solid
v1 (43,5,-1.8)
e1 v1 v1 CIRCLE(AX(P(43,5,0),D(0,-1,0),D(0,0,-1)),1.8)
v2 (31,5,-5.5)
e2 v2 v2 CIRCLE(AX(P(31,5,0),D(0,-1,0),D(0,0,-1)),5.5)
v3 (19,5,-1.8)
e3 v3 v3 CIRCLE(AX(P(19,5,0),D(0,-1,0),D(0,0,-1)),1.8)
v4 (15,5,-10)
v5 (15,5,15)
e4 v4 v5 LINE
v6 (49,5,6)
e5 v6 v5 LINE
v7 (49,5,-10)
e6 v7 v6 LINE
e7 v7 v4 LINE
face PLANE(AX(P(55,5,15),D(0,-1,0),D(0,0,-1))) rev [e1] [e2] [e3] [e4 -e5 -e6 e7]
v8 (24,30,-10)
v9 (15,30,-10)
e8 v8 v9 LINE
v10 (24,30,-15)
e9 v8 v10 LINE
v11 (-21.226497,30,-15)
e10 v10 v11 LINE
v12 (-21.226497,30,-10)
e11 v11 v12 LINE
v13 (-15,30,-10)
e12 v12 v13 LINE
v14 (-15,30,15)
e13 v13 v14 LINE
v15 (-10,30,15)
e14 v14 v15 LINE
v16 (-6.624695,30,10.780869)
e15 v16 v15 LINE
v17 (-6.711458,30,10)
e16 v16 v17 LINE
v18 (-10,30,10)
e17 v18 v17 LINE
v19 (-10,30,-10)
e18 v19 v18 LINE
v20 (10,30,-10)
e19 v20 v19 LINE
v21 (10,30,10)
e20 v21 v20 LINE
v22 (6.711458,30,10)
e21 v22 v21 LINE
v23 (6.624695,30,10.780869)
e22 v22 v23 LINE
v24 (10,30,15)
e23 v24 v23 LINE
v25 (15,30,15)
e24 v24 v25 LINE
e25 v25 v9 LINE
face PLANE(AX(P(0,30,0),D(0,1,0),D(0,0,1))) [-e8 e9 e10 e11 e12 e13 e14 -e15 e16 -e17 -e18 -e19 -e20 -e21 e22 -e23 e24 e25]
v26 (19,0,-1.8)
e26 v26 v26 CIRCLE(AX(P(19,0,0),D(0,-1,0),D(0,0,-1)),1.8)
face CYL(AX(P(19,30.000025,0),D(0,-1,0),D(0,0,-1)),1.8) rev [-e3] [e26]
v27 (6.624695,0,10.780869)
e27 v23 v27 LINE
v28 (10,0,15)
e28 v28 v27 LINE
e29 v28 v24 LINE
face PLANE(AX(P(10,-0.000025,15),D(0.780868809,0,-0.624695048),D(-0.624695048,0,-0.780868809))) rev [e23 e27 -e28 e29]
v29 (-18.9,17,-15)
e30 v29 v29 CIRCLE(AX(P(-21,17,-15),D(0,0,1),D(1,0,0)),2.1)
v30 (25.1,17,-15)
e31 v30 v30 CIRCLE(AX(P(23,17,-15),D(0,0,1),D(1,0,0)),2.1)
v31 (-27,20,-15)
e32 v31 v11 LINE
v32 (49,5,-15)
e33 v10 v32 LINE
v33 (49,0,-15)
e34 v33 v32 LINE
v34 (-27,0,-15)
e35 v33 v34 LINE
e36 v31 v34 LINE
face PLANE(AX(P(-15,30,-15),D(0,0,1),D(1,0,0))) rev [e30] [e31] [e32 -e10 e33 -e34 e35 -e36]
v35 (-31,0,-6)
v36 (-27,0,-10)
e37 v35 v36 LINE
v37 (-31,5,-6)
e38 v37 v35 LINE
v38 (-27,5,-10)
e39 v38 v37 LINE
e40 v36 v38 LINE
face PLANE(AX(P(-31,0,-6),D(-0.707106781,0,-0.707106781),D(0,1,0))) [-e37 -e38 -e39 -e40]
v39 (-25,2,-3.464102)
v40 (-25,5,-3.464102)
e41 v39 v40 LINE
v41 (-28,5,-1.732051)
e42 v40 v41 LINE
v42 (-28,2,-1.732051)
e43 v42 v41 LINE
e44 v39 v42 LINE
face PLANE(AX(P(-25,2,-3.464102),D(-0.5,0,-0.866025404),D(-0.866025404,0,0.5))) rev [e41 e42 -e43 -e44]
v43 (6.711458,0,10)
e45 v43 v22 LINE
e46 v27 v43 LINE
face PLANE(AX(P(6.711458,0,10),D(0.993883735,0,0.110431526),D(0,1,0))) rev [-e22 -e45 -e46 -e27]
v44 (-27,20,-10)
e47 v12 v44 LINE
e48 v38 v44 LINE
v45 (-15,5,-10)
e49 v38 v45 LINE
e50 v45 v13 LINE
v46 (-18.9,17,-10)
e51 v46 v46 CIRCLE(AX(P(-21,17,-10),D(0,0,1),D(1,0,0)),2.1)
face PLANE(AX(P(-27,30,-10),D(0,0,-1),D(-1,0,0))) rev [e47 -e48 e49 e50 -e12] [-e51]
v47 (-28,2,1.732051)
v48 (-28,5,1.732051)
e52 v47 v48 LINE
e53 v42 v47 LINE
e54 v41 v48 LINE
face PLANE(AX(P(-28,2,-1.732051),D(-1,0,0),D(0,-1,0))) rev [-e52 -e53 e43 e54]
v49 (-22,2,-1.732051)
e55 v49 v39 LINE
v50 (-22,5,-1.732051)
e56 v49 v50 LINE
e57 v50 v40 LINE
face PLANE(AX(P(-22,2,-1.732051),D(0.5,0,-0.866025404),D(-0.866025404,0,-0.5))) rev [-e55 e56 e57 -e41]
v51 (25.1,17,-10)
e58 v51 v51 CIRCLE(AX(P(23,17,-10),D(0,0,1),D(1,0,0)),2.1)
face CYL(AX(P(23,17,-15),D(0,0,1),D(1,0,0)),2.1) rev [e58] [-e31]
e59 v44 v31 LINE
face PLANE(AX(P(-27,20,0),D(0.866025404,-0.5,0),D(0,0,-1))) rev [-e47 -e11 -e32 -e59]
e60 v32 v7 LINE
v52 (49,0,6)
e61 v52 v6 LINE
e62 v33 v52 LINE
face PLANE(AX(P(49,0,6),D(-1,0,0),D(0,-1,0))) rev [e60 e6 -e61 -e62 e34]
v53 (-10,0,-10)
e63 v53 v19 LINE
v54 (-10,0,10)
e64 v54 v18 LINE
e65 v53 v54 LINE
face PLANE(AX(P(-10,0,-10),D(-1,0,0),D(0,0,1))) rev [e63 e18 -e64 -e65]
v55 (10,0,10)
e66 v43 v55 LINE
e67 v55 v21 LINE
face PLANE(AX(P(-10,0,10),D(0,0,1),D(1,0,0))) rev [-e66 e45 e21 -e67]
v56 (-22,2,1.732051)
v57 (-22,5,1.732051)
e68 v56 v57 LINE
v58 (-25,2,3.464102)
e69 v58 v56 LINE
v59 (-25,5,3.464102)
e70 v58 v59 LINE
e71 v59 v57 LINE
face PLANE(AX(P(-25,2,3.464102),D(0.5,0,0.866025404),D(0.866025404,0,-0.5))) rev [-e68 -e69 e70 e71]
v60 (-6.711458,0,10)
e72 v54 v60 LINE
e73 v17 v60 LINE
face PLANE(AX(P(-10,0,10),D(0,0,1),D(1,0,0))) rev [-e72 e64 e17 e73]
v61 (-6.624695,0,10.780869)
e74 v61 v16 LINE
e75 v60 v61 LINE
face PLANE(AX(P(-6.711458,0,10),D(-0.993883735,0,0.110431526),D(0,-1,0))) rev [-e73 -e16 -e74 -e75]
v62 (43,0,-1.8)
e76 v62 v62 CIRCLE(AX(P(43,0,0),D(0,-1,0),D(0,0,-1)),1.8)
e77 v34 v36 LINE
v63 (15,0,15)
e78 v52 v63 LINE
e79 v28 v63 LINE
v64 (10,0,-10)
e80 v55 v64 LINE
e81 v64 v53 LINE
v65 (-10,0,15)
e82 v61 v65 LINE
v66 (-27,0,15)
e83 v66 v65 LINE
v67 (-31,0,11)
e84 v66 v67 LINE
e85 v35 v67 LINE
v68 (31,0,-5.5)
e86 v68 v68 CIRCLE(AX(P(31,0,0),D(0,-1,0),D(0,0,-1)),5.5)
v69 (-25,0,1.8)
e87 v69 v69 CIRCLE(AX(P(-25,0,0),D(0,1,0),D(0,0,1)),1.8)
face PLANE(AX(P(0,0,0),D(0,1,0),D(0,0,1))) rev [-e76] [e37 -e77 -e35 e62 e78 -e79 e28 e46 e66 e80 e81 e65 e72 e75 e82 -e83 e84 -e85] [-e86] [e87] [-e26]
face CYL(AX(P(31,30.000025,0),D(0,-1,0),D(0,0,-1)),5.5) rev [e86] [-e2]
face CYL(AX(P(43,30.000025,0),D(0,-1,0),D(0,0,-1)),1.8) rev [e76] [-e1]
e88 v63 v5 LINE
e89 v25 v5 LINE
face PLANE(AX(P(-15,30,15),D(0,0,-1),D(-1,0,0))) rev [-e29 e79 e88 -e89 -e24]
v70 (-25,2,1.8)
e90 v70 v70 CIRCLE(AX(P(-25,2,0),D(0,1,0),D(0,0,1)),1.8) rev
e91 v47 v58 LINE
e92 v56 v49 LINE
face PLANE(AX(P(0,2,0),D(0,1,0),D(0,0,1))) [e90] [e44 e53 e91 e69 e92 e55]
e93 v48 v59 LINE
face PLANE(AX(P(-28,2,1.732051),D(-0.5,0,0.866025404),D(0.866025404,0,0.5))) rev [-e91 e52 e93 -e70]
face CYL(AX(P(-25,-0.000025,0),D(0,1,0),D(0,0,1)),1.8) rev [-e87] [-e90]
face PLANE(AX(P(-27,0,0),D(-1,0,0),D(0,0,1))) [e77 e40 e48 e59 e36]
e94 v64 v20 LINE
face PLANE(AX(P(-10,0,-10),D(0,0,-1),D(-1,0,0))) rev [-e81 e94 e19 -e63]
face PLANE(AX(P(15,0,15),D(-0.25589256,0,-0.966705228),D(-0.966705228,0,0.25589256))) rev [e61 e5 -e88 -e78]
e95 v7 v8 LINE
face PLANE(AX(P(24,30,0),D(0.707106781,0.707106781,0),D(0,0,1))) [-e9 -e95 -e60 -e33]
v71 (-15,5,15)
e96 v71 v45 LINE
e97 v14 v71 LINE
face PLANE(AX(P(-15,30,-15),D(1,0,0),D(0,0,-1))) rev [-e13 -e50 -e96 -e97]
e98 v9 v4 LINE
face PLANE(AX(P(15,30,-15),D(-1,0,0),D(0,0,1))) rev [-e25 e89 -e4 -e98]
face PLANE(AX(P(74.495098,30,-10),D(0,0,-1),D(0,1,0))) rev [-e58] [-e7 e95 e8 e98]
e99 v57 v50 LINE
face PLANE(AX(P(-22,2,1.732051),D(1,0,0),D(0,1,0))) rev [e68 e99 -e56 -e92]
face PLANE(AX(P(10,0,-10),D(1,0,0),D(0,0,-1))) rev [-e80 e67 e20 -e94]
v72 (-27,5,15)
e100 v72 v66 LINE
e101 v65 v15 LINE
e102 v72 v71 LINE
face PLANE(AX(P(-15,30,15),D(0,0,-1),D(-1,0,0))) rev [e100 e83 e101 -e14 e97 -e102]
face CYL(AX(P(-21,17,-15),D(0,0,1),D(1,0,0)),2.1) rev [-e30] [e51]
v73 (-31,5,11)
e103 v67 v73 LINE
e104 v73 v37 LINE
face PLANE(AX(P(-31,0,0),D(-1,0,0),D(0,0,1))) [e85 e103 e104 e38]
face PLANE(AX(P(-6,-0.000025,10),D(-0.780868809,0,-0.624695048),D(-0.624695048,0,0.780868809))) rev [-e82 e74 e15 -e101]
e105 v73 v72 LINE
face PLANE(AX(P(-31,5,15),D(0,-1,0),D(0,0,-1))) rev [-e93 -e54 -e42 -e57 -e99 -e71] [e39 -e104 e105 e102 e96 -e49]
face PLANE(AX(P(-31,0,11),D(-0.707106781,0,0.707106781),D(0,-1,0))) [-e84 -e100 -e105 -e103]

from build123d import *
from OCP.BRepFilletAPI import BRepFilletAPI_MakeChamfer

# Parameters (mm, degrees)
SKETCH1_W           = 30
SKETCH1_H           = 30
BOSS_EXTRUDE1_DEPTH = 30
SKETCH2_W           = 20
SKETCH2_H           = 20
CUT_EXTRUDE1_DEPTH  = 37.742346142
SKETCH3_W           = 30
SKETCH3_H           = 5
BOSS_EXTRUDE2_DEPTH = 40
SKETCH4_R           = 5.5
SKETCH4_R_2         = 1.8
CUT_EXTRUDE2_DEPTH  = 65.420493634
CUT_EXTRUDE3_DEPTH  = 63.24949799
SKETCH5_W           = 5
SKETCH5_H           = 25
BOSS_EXTRUDE4_DEPTH = 34
CHAMFER1_SIZE       = 25
SKETCH8_R           = 2.1
CUT_EXTRUDE4_DEPTH  = 63.657800791
SKETCH9_W           = 5
SKETCH9_H           = 30
BOSS_EXTRUDE5_DEPTH = 12
CHAMFER2_SIZE       = 10
CHAMFER2_SIZE2      = 5.773502692
SKETCH10_R          = 2.1
CUT_EXTRUDE5_DEPTH  = 63.657800791
SKETCH11_W          = 25
SKETCH11_H          = 5
BOSS_EXTRUDE6_DEPTH = 16
CHAMFER3_SIZE       = 4
SKETCH12_R          = 1.8
CUT_EXTRUDE6_DEPTH  = 58.017541161
CUT_EXTRUDE7_DEPTH  = 3
CUT_EXTRUDE8_DEPTH  = 60.380131357
CHAMFER4_SIZE       = 1
CHAMFER4_SIZE2      = 0.711458249


with BuildPart() as part:
    # Sketch1 → Boss-Extrude1 (new body)
    with BuildSketch(Plane(origin=(0, 0, 0), x_dir=(1, 0, 0), z_dir=(0, 1, 0))):
        Rectangle(SKETCH1_W, SKETCH1_H)
    extrude(amount=BOSS_EXTRUDE1_DEPTH)

    # Sketch2 → Cut-Extrude1 (cut, through all)
    with BuildSketch(Plane(origin=(0, 30, 0), x_dir=(1, 0, 0), z_dir=(0, 1, 0))):
        Rectangle(SKETCH2_W, SKETCH2_H)
    extrude(amount=-CUT_EXTRUDE1_DEPTH, mode=Mode.SUBTRACT)

    # Sketch3 → Boss-Extrude2 (add)
    with BuildSketch(Plane(origin=(15, 0, 0), x_dir=(0, 0, -1), z_dir=(1, 0, 0))):
        with Locations((0, 2.5)):
            Rectangle(SKETCH3_W, SKETCH3_H)
    extrude(amount=BOSS_EXTRUDE2_DEPTH)

    # Sketch4 → Cut-Extrude2 (cut, through all)
    with BuildSketch(Plane.XZ):
        with Locations(Location((31, 0, 0), (0, 0, 270))):
            Circle(SKETCH4_R)
        with Locations(Location((19, 0, 0), (0, 0, 270))):
            Circle(SKETCH4_R_2)
        with Locations(Location((43, 0, 0), (0, 0, 270))):
            Circle(SKETCH4_R_2)
    extrude(amount=-CUT_EXTRUDE2_DEPTH, mode=Mode.SUBTRACT)

    # Sketch7 → Cut-Extrude3 (cut, through all)
    with BuildSketch(Plane(origin=(0, 5, 0), x_dir=(1, 0, 0), z_dir=(0, 1, 0))):
        Polygon((15, -15), (49, -6), (49, 15), (55, 15), (55, -15), align=None)
    extrude(amount=-CUT_EXTRUDE3_DEPTH, mode=Mode.SUBTRACT)

    # Sketch5 → Boss-Extrude4 (add)
    with BuildSketch(Plane(origin=(15, 0, 0), x_dir=(0, 0, -1), z_dir=(1, 0, 0))):
        with Locations((12.5, 17.5)):
            Rectangle(SKETCH5_W, SKETCH5_H)
    extrude(amount=BOSS_EXTRUDE4_DEPTH)

    # Chamfer1
    chamfer1_edges = [part.edges().sort_by_distance(p)[0] for p in [
        (49, 30, -12.5),
    ]]
    chamfer(chamfer1_edges, length=CHAMFER1_SIZE)

    # Sketch8 → Cut-Extrude4 (cut, through all)
    with BuildSketch(Plane.XY.offset(-10)):
        with Locations((23, 17)):
            Circle(SKETCH8_R)
    extrude(amount=-CUT_EXTRUDE4_DEPTH, mode=Mode.SUBTRACT)

    # Sketch9 → Boss-Extrude5 (add)
    with BuildSketch(Plane.ZY.offset(15)):
        with Locations((-12.5, 15)):
            Rectangle(SKETCH9_W, SKETCH9_H)
    extrude(amount=BOSS_EXTRUDE5_DEPTH)

    # Chamfer2
    chamfer2_edges = [part.edges().sort_by_distance(p)[0] for p in [
        (-27, 30, -12.5),
    ]]
    chamfer2_side = [part.faces().sort_by_distance(p)[0] for p in [
        (-27, 15, -12.5),
    ]]
    chamfer(chamfer2_edges, length=CHAMFER2_SIZE, length2=CHAMFER2_SIZE2, reference=chamfer2_side[0])

    # Sketch10 → Cut-Extrude5 (cut, through all)
    with BuildSketch(Plane.XY.offset(-10)):
        with Locations((-21, 17)):
            Circle(SKETCH10_R)
    extrude(amount=-CUT_EXTRUDE5_DEPTH, mode=Mode.SUBTRACT)

    # Sketch11 → Boss-Extrude6 (add)
    with BuildSketch(Plane.ZY.offset(15)):
        with Locations((2.5, 2.5)):
            Rectangle(SKETCH11_W, SKETCH11_H)
    extrude(amount=BOSS_EXTRUDE6_DEPTH)

    # Chamfer3
    chamfer3_edges = [part.edges().sort_by_distance(p)[0] for p in [
        (-31, 2.5, 15),
        (-31, 2.5, -10),
    ]]
    chamfer(chamfer3_edges, length=CHAMFER3_SIZE - 0.0001)  # a hair under: the kernel refuses the full size

    # Sketch12 → Cut-Extrude6 (cut, through all)
    with BuildSketch(Plane(origin=(0, 5, 0), x_dir=(1, 0, 0), z_dir=(0, 1, 0))):
        with Locations(Location((-25, 0, 0), (0, 0, 270))):
            Circle(SKETCH12_R)
    extrude(amount=-CUT_EXTRUDE6_DEPTH, mode=Mode.SUBTRACT)

    # Sketch13 → Cut-Extrude7 (cut)
    with BuildSketch(Plane(origin=(0, 5, 0), x_dir=(1, 0, 0), z_dir=(0, 1, 0))):
        Polygon((-25, -3.464101615), (-22, -1.732050808), (-22, 1.732050808), (-25, 3.464101615), (-28, 1.732050808), (-28, -1.732050808), align=None)
    extrude(amount=-CUT_EXTRUDE7_DEPTH, mode=Mode.SUBTRACT)

    # Sketch14 → Cut-Extrude8 (cut, through all)
    with BuildSketch(Plane(origin=(0, 30, 0), x_dir=(1, 0, 0), z_dir=(0, 1, 0))):
        Polygon((-6, -10), (-10, -15), (10, -15), (6, -10), align=None)
    extrude(amount=-CUT_EXTRUDE8_DEPTH, mode=Mode.SUBTRACT)

    # Chamfer4: one chamfer whose edges measure the first distance from different faces: ONE call of the kernel's chamfer builder (chamfer() names one face for all edges)
    chamfer4_edges_1 = [part.edges().sort_by_distance(p)[0] for p in [
        (-6, 15, 10),
    ]]
    chamfer4_side_1 = [part.faces().sort_by_distance(p)[0] for p in [
        (-8, 15, 12.5),
    ]]
    chamfer4_edges_2 = [part.edges().sort_by_distance(p)[0] for p in [
        (6, 15, 10),
    ]]
    chamfer4_side_2 = [part.faces().sort_by_distance(p)[0] for p in [
        (8, 15, 12.5),
    ]]
    chamfer4 = BRepFilletAPI_MakeChamfer(part.part.solid().wrapped)
    for e in chamfer4_edges_1:
        chamfer4.Add(CHAMFER4_SIZE, CHAMFER4_SIZE2, e.wrapped, chamfer4_side_1[0].wrapped)  # the first distance lies on this face
    for e in chamfer4_edges_2:
        chamfer4.Add(CHAMFER4_SIZE, CHAMFER4_SIZE2, e.wrapped, chamfer4_side_2[0].wrapped)  # the first distance lies on this face
    add(Compound.cast(chamfer4.Shape()), mode=Mode.REPLACE)


solid = part.part
